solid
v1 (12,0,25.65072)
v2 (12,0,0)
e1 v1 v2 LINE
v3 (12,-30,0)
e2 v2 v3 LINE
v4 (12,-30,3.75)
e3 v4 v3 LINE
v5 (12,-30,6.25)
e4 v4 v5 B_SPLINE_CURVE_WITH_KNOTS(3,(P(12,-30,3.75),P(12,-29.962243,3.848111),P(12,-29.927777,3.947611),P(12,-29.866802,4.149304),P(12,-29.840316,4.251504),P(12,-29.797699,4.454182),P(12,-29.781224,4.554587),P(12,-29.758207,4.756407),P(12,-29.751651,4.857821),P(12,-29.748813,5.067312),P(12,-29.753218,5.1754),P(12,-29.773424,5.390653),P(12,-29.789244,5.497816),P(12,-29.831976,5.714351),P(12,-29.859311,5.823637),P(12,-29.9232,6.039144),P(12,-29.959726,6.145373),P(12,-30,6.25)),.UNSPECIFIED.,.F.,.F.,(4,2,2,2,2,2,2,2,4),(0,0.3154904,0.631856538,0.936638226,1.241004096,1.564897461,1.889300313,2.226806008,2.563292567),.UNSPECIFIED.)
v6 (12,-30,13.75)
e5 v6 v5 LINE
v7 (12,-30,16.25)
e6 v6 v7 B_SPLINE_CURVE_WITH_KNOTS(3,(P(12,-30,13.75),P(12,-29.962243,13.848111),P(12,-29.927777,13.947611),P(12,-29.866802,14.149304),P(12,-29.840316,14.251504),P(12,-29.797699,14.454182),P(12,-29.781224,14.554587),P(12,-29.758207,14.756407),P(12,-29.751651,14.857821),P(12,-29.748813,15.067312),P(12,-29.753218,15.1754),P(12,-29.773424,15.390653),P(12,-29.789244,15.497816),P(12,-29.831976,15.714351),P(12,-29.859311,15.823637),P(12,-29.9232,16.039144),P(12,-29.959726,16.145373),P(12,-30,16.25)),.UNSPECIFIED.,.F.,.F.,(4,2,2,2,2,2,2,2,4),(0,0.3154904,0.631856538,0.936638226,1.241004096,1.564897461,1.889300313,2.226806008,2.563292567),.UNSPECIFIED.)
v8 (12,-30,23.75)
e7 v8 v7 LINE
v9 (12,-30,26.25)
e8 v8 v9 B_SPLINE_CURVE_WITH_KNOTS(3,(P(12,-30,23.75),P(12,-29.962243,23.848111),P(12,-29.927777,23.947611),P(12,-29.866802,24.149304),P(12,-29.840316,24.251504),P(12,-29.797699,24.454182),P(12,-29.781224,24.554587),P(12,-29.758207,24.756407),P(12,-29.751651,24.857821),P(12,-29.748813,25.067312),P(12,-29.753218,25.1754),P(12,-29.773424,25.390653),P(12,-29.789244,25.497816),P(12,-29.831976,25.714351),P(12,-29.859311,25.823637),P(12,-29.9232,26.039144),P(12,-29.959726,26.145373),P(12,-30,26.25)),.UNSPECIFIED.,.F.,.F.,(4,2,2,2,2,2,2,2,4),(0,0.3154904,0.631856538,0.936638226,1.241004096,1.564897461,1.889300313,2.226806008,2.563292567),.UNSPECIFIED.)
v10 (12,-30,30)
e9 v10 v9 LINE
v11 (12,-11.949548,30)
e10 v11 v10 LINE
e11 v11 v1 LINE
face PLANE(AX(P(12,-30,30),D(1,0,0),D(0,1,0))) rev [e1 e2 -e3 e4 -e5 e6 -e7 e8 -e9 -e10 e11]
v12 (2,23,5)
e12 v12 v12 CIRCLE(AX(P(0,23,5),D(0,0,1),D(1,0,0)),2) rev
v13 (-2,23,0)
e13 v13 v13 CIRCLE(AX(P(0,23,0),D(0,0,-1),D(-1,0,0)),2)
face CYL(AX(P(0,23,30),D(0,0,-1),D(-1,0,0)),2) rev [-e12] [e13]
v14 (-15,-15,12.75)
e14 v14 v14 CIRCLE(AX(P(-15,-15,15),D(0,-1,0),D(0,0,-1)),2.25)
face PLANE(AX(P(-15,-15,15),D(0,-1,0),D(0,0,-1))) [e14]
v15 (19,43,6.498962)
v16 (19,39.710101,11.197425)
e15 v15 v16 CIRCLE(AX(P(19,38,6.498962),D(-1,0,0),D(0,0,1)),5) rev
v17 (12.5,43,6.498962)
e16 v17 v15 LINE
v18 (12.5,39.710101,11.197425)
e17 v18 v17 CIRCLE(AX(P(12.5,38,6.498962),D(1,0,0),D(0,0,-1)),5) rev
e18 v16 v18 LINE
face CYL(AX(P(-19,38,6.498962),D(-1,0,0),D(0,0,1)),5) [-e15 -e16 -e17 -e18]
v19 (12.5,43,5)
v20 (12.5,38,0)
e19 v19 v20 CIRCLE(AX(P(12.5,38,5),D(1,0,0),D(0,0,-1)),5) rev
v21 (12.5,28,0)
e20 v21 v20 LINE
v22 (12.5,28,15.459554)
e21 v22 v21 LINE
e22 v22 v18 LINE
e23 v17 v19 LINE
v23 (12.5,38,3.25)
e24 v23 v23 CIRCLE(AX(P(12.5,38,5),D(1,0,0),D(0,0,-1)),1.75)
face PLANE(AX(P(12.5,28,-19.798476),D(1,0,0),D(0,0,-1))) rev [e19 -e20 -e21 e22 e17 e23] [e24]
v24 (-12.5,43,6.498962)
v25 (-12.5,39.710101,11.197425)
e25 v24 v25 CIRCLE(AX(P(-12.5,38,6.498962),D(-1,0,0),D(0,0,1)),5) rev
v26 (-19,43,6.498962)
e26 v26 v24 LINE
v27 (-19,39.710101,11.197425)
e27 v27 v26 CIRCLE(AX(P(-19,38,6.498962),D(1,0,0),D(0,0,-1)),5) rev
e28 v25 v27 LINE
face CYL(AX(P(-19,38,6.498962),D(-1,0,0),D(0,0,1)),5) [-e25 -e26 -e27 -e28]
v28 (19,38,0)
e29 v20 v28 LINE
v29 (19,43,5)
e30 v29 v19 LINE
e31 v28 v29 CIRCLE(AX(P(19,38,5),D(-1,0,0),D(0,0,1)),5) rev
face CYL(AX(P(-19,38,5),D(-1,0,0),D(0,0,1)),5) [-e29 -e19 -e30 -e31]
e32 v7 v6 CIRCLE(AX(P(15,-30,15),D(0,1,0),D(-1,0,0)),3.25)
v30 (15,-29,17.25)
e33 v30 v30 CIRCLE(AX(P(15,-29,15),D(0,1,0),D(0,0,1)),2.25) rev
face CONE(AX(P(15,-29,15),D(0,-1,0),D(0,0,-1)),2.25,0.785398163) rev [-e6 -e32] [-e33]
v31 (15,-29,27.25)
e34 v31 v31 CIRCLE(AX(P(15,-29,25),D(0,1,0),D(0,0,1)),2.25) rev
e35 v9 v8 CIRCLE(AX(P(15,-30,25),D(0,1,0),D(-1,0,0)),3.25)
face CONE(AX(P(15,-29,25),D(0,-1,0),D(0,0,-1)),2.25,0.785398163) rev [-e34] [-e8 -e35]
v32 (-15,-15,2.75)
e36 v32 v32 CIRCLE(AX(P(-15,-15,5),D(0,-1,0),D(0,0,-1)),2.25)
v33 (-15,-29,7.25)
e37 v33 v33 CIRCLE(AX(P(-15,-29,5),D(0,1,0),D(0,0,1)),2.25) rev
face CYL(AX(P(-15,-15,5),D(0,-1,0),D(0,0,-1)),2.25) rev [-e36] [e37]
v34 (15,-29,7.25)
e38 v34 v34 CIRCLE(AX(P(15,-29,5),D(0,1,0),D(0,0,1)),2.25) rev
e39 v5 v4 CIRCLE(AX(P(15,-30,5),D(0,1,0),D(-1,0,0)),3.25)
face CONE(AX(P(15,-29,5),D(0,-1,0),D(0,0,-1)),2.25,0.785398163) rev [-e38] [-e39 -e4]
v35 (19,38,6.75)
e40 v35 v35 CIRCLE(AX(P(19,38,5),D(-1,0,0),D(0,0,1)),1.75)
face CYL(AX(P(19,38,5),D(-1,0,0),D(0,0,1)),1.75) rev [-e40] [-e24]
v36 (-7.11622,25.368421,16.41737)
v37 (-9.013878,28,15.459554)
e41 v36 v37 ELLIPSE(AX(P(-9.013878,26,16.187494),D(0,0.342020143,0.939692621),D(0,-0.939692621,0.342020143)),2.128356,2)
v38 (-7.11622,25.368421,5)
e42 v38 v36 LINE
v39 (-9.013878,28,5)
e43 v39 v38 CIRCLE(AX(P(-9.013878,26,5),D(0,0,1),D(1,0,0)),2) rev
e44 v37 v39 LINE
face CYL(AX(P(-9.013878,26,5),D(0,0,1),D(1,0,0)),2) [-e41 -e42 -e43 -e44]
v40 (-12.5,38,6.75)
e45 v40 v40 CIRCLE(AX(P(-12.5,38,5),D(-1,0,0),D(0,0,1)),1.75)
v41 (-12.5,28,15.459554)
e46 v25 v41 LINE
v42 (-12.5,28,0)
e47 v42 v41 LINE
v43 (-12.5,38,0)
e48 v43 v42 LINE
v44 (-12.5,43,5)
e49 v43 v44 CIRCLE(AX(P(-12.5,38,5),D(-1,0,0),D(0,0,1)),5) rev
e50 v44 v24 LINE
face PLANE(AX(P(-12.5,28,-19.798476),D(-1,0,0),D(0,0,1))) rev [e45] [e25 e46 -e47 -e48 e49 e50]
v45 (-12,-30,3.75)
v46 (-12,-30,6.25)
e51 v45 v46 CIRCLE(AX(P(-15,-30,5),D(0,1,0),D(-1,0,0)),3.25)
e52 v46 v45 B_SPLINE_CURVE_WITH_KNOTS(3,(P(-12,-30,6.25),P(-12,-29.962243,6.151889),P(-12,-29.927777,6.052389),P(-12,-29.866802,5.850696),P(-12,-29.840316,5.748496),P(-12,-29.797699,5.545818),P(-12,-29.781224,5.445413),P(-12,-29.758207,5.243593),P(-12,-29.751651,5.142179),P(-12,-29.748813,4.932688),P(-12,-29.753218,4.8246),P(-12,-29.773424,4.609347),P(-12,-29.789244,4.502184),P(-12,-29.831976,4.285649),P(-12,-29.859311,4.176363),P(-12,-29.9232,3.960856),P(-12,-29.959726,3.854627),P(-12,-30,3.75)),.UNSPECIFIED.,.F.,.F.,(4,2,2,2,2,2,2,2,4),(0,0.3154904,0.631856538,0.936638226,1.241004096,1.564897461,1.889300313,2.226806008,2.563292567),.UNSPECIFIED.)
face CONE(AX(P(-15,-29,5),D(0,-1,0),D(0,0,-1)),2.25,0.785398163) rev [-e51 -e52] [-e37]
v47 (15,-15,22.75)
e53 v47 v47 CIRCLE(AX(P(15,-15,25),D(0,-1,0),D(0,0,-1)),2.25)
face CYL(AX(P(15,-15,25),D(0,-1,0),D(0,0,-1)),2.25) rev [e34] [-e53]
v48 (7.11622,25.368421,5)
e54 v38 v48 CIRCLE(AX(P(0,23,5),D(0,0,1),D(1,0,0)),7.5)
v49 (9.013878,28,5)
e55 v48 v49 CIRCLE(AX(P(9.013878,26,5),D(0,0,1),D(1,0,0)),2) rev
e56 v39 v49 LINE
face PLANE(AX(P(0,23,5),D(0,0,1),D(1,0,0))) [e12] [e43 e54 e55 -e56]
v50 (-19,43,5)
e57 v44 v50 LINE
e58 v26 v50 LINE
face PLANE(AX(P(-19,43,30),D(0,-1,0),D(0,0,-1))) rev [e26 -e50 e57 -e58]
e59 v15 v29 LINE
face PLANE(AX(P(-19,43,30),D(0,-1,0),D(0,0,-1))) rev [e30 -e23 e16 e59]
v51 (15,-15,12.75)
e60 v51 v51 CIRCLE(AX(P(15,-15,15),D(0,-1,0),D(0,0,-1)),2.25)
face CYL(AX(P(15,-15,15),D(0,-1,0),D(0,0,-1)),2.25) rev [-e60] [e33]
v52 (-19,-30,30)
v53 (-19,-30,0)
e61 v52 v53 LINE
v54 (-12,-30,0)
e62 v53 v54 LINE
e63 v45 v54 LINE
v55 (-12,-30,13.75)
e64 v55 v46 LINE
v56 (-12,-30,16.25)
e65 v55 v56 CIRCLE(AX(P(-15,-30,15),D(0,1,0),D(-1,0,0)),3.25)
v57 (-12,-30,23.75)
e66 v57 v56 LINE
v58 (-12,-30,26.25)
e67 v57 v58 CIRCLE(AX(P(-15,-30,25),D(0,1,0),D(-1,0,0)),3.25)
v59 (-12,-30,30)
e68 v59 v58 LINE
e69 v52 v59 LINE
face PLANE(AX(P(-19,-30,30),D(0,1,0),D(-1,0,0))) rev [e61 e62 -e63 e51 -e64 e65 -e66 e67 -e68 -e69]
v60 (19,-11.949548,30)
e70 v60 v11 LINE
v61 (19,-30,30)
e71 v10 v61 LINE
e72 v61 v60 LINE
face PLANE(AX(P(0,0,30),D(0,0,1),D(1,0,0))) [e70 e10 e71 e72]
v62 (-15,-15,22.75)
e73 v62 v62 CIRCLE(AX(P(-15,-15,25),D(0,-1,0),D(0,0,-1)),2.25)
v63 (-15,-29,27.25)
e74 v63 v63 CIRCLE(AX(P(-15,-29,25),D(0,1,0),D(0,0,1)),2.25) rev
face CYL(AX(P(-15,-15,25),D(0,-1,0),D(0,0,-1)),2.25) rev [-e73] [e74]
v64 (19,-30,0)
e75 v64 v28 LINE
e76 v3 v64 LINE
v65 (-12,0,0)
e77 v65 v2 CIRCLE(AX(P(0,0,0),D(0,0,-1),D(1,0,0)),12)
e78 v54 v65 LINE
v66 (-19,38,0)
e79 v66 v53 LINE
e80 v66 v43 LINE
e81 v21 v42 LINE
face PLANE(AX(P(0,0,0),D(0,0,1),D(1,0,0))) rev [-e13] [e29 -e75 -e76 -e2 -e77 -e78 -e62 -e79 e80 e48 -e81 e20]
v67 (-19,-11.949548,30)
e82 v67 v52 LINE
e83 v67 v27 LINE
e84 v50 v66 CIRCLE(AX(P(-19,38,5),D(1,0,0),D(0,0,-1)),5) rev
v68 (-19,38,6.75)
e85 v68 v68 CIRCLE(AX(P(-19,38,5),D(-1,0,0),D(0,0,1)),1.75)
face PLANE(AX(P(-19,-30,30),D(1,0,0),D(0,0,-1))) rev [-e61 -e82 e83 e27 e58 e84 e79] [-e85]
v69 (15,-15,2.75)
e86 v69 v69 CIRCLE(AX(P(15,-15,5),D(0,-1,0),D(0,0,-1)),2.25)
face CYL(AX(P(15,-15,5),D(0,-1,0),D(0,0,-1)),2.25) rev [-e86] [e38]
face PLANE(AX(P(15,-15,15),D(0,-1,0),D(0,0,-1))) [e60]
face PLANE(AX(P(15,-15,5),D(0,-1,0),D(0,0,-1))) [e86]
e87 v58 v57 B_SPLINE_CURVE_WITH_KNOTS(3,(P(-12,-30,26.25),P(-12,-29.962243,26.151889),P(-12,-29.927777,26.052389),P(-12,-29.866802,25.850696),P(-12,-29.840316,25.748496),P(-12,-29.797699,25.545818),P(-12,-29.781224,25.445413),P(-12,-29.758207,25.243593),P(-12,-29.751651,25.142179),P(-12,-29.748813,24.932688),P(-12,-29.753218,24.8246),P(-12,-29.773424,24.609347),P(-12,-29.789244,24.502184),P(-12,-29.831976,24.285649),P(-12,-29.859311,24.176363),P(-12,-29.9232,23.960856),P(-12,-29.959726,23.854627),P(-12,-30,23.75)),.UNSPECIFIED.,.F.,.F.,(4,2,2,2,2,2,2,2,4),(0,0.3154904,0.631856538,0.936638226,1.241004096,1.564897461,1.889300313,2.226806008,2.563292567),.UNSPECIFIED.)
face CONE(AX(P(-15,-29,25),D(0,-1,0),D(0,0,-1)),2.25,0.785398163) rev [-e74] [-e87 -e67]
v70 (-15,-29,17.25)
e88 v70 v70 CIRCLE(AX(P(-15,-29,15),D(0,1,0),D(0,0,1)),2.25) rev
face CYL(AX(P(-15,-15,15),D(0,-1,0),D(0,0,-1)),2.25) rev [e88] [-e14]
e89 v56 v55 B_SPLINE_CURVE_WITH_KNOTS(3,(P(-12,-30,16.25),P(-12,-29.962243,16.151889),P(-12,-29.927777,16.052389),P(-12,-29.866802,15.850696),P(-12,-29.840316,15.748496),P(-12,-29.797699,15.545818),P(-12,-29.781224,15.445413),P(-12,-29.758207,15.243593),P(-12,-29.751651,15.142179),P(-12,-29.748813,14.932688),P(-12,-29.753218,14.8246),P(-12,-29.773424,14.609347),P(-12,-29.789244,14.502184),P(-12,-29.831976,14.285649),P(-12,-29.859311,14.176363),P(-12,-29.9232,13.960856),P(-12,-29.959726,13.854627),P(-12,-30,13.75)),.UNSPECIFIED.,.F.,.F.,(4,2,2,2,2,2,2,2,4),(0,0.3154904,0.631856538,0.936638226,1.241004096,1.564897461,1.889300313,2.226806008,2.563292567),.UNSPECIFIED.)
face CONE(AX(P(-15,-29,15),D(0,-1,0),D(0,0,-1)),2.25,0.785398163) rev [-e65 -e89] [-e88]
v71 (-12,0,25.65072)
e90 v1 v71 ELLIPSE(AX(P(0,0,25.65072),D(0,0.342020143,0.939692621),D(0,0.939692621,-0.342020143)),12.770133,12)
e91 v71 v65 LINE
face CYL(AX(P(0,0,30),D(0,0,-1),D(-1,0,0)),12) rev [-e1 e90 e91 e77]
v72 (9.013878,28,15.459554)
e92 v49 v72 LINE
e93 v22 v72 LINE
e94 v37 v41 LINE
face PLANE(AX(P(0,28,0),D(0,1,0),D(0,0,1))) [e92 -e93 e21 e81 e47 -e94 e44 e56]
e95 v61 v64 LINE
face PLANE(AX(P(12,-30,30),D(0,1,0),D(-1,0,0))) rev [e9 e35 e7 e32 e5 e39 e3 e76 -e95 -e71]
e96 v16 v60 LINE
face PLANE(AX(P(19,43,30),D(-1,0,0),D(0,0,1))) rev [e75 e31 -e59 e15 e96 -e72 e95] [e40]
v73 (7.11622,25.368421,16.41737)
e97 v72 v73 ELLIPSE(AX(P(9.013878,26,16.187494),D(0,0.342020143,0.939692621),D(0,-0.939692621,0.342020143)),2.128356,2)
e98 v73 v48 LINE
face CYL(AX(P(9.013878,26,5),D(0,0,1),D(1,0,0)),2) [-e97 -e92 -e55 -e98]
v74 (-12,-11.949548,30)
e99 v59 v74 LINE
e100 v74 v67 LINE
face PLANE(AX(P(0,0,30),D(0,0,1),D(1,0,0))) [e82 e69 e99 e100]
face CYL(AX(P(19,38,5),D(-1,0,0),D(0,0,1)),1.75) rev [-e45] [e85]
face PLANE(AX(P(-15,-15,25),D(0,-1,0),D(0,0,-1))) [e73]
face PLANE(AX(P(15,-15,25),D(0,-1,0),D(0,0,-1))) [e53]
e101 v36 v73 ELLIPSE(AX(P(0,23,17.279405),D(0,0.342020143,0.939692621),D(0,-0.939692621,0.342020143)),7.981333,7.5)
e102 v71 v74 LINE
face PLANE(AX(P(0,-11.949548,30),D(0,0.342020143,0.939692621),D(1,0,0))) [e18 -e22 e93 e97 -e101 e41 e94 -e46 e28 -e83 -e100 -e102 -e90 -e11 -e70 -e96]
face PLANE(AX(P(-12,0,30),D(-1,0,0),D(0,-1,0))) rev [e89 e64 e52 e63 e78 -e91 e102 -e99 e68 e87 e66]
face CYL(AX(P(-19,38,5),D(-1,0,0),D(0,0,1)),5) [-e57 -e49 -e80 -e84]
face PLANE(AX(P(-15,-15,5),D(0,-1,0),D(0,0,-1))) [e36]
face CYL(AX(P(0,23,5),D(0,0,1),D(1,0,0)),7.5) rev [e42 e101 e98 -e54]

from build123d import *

# Parameters (mm, degrees)
BOSS_EXTRUDE1_DEPTH = 30
SKETCH2_R           = 2.25
CUT_EXTRUDE1_DEPTH  = 15
FILLET1_R           = 5
CHAMFER1_SIZE       = 20
CHAMFER1_SIZE_2     = 54.949548389
SKETCH3_W           = 25
SKETCH3_H           = 39.596952294
CUT_EXTRUDE2_DEPTH  = 15
SKETCH4_R           = 1.75
CUT_EXTRUDE3_DEPTH  = 65.75337829
CHAMFER2_SIZE       = 1
SKETCH5_R           = 2
CUT_EXTRUDE4_DEPTH  = 56.767373974
SKETCH6_R           = 7.5
CUT_EXTRUDE5_DEPTH  = 25
FILLET2_R           = 2
FILLET3_R           = 5


with BuildPart() as part:
    # Sketch1 → Boss-Extrude1 (new body)
    with BuildSketch(Plane.XY):
        with BuildLine():
            Line((-12, 0), (-12, -30))
            Line((-12, -30), (-19, -30))
            Line((-19, -30), (-19, 43))
            Line((-19, 43), (19, 43))
            Line((19, 43), (19, -30))
            Line((19, -30), (12, -30))
            Line((12, -30), (12, 0))
            ThreePointArc((12, 0), (0, 12), (-12, 0))
        make_face()
    extrude(amount=BOSS_EXTRUDE1_DEPTH)

    # Sketch2 → Cut-Extrude1 (cut)
    with BuildSketch(Plane.XZ.offset(30)):
        with Locations(Location((-15, 5, 0), (0, 0, 270))):
            Circle(SKETCH2_R)
        with Locations(Location((15, 5, 0), (0, 0, 270))):
            Circle(SKETCH2_R)
        with Locations(Location((-15, 15, 0), (0, 0, 270))):
            Circle(SKETCH2_R)
        with Locations(Location((15, 15, 0), (0, 0, 270))):
            Circle(SKETCH2_R)
        with Locations(Location((-15, 25, 0), (0, 0, 270))):
            Circle(SKETCH2_R)
        with Locations(Location((15, 25, 0), (0, 0, 270))):
            Circle(SKETCH2_R)
    extrude(amount=-CUT_EXTRUDE1_DEPTH, mode=Mode.SUBTRACT)

    # Fillet1
    fillet1_edges = [part.edges().sort_by_distance(p)[0] for p in [
        (0, 43, 0),
    ]]
    fillet(fillet1_edges, radius=FILLET1_R)

    # Chamfer1
    # the kernel refuses this chamfer: 54.949548389, 20 mm, written as the material it takes off along each edge
    with BuildSketch(Plane(origin=(-161.549828987, 43, 30), x_dir=(0, 0.09904090225205052, -0.9950833631817486), z_dir=(1, 0, 0))) as chamfer1_piece_1:
        Polygon((CHAMFER1_SIZE * 0.995083363182, -CHAMFER1_SIZE * 0.0990409022521), (-CHAMFER1_SIZE_2 * 0.0990409022522, -CHAMFER1_SIZE_2 * 0.995083363183), (0, 0), align=None)
    extrude(amount=323.099657974, mode=Mode.SUBTRACT)

    # Sketch3 → Cut-Extrude2 (cut)
    with BuildSketch(Plane(origin=(0, 43, 0), x_dir=(1, 0, 0), z_dir=(0, 1, 0))):
        Rectangle(SKETCH3_W, SKETCH3_H)
    extrude(amount=-CUT_EXTRUDE2_DEPTH, mode=Mode.SUBTRACT)

    # Sketch4 → Cut-Extrude3 (cut, through all)
    with BuildSketch(Plane.ZY.offset(19)):
        with Locations((5, 38)):
            Circle(SKETCH4_R)
    extrude(amount=-CUT_EXTRUDE3_DEPTH, mode=Mode.SUBTRACT)

    # Chamfer2
    # the kernel refuses this chamfer: 1 mm, written as the material it takes off along each edge
    with BuildSketch(Plane(origin=(-15, -30, 25), x_dir=(0, 0, -1), z_dir=(-1, 0, 0))) as chamfer2_piece_1:
        Polygon((2.25 + CHAMFER2_SIZE, 0), (2.25, -CHAMFER2_SIZE), (2.25, 0), align=None)
    revolve(axis=Axis((-15, -30, 25), (0, -1, 0)), mode=Mode.SUBTRACT)
    with BuildSketch(Plane(origin=(15, -30, 15), x_dir=(0, 0, -1), z_dir=(-1, 0, 0))) as chamfer2_piece_2:
        Polygon((2.25 + CHAMFER2_SIZE, 0), (2.25, -CHAMFER2_SIZE), (2.25, 0), align=None)
    revolve(axis=Axis((15, -30, 15), (0, -1, 0)), mode=Mode.SUBTRACT)
    with BuildSketch(Plane(origin=(-15, -30, 15), x_dir=(0, 0, -1), z_dir=(-1, 0, 0))) as chamfer2_piece_3:
        Polygon((2.25 + CHAMFER2_SIZE, 0), (2.25, -CHAMFER2_SIZE), (2.25, 0), align=None)
    revolve(axis=Axis((-15, -30, 15), (0, -1, 0)), mode=Mode.SUBTRACT)
    with BuildSketch(Plane(origin=(15, -30, 5), x_dir=(0, 0, -1), z_dir=(-1, 0, 0))) as chamfer2_piece_4:
        Polygon((2.25 + CHAMFER2_SIZE, 0), (2.25, -CHAMFER2_SIZE), (2.25, 0), align=None)
    revolve(axis=Axis((15, -30, 5), (0, -1, 0)), mode=Mode.SUBTRACT)
    with BuildSketch(Plane(origin=(15, -30, 25), x_dir=(0, 0, -1), z_dir=(-1, 0, 0))) as chamfer2_piece_5:
        Polygon((2.25 + CHAMFER2_SIZE, 0), (2.25, -CHAMFER2_SIZE), (2.25, 0), align=None)
    revolve(axis=Axis((15, -30, 25), (0, -1, 0)), mode=Mode.SUBTRACT)
    with BuildSketch(Plane(origin=(-15, -30, 5), x_dir=(0, 0, -1), z_dir=(-1, 0, 0))) as chamfer2_piece_6:
        Polygon((2.25 + CHAMFER2_SIZE, 0), (2.25, -CHAMFER2_SIZE), (2.25, 0), align=None)
    revolve(axis=Axis((-15, -30, 5), (0, -1, 0)), mode=Mode.SUBTRACT)

    # Sketch5 → Cut-Extrude4 (cut, through all)
    with BuildSketch(Plane(origin=(0, 0, 0), x_dir=(-1, 0, 0), z_dir=(0, 0, -1))):
        with Locations((0, 23)):
            Circle(SKETCH5_R)
    extrude(amount=-CUT_EXTRUDE4_DEPTH, mode=Mode.SUBTRACT)

    # Sketch6 → Cut-Extrude5 (cut)
    with BuildSketch(Plane.XY.offset(30)):
        with Locations((0, 23)):
            Circle(SKETCH6_R)
    extrude(amount=-CUT_EXTRUDE5_DEPTH, mode=Mode.SUBTRACT)

    # Fillet2
    fillet2_edges = [part.edges().sort_by_distance(p)[0] for p in [
        (-5.590169944, 28, 10.229776757),
        (5.590169944, 28, 10.229776757),
    ]]
    fillet(fillet2_edges, radius=FILLET2_R)

    # Fillet3
    fillet3_edges = [part.edges().sort_by_distance(p)[0] for p in [
        (-15.75, 43, 10),
        (15.75, 43, 10),
    ]]
    fillet(fillet3_edges, radius=FILLET3_R)


solid = part.part
